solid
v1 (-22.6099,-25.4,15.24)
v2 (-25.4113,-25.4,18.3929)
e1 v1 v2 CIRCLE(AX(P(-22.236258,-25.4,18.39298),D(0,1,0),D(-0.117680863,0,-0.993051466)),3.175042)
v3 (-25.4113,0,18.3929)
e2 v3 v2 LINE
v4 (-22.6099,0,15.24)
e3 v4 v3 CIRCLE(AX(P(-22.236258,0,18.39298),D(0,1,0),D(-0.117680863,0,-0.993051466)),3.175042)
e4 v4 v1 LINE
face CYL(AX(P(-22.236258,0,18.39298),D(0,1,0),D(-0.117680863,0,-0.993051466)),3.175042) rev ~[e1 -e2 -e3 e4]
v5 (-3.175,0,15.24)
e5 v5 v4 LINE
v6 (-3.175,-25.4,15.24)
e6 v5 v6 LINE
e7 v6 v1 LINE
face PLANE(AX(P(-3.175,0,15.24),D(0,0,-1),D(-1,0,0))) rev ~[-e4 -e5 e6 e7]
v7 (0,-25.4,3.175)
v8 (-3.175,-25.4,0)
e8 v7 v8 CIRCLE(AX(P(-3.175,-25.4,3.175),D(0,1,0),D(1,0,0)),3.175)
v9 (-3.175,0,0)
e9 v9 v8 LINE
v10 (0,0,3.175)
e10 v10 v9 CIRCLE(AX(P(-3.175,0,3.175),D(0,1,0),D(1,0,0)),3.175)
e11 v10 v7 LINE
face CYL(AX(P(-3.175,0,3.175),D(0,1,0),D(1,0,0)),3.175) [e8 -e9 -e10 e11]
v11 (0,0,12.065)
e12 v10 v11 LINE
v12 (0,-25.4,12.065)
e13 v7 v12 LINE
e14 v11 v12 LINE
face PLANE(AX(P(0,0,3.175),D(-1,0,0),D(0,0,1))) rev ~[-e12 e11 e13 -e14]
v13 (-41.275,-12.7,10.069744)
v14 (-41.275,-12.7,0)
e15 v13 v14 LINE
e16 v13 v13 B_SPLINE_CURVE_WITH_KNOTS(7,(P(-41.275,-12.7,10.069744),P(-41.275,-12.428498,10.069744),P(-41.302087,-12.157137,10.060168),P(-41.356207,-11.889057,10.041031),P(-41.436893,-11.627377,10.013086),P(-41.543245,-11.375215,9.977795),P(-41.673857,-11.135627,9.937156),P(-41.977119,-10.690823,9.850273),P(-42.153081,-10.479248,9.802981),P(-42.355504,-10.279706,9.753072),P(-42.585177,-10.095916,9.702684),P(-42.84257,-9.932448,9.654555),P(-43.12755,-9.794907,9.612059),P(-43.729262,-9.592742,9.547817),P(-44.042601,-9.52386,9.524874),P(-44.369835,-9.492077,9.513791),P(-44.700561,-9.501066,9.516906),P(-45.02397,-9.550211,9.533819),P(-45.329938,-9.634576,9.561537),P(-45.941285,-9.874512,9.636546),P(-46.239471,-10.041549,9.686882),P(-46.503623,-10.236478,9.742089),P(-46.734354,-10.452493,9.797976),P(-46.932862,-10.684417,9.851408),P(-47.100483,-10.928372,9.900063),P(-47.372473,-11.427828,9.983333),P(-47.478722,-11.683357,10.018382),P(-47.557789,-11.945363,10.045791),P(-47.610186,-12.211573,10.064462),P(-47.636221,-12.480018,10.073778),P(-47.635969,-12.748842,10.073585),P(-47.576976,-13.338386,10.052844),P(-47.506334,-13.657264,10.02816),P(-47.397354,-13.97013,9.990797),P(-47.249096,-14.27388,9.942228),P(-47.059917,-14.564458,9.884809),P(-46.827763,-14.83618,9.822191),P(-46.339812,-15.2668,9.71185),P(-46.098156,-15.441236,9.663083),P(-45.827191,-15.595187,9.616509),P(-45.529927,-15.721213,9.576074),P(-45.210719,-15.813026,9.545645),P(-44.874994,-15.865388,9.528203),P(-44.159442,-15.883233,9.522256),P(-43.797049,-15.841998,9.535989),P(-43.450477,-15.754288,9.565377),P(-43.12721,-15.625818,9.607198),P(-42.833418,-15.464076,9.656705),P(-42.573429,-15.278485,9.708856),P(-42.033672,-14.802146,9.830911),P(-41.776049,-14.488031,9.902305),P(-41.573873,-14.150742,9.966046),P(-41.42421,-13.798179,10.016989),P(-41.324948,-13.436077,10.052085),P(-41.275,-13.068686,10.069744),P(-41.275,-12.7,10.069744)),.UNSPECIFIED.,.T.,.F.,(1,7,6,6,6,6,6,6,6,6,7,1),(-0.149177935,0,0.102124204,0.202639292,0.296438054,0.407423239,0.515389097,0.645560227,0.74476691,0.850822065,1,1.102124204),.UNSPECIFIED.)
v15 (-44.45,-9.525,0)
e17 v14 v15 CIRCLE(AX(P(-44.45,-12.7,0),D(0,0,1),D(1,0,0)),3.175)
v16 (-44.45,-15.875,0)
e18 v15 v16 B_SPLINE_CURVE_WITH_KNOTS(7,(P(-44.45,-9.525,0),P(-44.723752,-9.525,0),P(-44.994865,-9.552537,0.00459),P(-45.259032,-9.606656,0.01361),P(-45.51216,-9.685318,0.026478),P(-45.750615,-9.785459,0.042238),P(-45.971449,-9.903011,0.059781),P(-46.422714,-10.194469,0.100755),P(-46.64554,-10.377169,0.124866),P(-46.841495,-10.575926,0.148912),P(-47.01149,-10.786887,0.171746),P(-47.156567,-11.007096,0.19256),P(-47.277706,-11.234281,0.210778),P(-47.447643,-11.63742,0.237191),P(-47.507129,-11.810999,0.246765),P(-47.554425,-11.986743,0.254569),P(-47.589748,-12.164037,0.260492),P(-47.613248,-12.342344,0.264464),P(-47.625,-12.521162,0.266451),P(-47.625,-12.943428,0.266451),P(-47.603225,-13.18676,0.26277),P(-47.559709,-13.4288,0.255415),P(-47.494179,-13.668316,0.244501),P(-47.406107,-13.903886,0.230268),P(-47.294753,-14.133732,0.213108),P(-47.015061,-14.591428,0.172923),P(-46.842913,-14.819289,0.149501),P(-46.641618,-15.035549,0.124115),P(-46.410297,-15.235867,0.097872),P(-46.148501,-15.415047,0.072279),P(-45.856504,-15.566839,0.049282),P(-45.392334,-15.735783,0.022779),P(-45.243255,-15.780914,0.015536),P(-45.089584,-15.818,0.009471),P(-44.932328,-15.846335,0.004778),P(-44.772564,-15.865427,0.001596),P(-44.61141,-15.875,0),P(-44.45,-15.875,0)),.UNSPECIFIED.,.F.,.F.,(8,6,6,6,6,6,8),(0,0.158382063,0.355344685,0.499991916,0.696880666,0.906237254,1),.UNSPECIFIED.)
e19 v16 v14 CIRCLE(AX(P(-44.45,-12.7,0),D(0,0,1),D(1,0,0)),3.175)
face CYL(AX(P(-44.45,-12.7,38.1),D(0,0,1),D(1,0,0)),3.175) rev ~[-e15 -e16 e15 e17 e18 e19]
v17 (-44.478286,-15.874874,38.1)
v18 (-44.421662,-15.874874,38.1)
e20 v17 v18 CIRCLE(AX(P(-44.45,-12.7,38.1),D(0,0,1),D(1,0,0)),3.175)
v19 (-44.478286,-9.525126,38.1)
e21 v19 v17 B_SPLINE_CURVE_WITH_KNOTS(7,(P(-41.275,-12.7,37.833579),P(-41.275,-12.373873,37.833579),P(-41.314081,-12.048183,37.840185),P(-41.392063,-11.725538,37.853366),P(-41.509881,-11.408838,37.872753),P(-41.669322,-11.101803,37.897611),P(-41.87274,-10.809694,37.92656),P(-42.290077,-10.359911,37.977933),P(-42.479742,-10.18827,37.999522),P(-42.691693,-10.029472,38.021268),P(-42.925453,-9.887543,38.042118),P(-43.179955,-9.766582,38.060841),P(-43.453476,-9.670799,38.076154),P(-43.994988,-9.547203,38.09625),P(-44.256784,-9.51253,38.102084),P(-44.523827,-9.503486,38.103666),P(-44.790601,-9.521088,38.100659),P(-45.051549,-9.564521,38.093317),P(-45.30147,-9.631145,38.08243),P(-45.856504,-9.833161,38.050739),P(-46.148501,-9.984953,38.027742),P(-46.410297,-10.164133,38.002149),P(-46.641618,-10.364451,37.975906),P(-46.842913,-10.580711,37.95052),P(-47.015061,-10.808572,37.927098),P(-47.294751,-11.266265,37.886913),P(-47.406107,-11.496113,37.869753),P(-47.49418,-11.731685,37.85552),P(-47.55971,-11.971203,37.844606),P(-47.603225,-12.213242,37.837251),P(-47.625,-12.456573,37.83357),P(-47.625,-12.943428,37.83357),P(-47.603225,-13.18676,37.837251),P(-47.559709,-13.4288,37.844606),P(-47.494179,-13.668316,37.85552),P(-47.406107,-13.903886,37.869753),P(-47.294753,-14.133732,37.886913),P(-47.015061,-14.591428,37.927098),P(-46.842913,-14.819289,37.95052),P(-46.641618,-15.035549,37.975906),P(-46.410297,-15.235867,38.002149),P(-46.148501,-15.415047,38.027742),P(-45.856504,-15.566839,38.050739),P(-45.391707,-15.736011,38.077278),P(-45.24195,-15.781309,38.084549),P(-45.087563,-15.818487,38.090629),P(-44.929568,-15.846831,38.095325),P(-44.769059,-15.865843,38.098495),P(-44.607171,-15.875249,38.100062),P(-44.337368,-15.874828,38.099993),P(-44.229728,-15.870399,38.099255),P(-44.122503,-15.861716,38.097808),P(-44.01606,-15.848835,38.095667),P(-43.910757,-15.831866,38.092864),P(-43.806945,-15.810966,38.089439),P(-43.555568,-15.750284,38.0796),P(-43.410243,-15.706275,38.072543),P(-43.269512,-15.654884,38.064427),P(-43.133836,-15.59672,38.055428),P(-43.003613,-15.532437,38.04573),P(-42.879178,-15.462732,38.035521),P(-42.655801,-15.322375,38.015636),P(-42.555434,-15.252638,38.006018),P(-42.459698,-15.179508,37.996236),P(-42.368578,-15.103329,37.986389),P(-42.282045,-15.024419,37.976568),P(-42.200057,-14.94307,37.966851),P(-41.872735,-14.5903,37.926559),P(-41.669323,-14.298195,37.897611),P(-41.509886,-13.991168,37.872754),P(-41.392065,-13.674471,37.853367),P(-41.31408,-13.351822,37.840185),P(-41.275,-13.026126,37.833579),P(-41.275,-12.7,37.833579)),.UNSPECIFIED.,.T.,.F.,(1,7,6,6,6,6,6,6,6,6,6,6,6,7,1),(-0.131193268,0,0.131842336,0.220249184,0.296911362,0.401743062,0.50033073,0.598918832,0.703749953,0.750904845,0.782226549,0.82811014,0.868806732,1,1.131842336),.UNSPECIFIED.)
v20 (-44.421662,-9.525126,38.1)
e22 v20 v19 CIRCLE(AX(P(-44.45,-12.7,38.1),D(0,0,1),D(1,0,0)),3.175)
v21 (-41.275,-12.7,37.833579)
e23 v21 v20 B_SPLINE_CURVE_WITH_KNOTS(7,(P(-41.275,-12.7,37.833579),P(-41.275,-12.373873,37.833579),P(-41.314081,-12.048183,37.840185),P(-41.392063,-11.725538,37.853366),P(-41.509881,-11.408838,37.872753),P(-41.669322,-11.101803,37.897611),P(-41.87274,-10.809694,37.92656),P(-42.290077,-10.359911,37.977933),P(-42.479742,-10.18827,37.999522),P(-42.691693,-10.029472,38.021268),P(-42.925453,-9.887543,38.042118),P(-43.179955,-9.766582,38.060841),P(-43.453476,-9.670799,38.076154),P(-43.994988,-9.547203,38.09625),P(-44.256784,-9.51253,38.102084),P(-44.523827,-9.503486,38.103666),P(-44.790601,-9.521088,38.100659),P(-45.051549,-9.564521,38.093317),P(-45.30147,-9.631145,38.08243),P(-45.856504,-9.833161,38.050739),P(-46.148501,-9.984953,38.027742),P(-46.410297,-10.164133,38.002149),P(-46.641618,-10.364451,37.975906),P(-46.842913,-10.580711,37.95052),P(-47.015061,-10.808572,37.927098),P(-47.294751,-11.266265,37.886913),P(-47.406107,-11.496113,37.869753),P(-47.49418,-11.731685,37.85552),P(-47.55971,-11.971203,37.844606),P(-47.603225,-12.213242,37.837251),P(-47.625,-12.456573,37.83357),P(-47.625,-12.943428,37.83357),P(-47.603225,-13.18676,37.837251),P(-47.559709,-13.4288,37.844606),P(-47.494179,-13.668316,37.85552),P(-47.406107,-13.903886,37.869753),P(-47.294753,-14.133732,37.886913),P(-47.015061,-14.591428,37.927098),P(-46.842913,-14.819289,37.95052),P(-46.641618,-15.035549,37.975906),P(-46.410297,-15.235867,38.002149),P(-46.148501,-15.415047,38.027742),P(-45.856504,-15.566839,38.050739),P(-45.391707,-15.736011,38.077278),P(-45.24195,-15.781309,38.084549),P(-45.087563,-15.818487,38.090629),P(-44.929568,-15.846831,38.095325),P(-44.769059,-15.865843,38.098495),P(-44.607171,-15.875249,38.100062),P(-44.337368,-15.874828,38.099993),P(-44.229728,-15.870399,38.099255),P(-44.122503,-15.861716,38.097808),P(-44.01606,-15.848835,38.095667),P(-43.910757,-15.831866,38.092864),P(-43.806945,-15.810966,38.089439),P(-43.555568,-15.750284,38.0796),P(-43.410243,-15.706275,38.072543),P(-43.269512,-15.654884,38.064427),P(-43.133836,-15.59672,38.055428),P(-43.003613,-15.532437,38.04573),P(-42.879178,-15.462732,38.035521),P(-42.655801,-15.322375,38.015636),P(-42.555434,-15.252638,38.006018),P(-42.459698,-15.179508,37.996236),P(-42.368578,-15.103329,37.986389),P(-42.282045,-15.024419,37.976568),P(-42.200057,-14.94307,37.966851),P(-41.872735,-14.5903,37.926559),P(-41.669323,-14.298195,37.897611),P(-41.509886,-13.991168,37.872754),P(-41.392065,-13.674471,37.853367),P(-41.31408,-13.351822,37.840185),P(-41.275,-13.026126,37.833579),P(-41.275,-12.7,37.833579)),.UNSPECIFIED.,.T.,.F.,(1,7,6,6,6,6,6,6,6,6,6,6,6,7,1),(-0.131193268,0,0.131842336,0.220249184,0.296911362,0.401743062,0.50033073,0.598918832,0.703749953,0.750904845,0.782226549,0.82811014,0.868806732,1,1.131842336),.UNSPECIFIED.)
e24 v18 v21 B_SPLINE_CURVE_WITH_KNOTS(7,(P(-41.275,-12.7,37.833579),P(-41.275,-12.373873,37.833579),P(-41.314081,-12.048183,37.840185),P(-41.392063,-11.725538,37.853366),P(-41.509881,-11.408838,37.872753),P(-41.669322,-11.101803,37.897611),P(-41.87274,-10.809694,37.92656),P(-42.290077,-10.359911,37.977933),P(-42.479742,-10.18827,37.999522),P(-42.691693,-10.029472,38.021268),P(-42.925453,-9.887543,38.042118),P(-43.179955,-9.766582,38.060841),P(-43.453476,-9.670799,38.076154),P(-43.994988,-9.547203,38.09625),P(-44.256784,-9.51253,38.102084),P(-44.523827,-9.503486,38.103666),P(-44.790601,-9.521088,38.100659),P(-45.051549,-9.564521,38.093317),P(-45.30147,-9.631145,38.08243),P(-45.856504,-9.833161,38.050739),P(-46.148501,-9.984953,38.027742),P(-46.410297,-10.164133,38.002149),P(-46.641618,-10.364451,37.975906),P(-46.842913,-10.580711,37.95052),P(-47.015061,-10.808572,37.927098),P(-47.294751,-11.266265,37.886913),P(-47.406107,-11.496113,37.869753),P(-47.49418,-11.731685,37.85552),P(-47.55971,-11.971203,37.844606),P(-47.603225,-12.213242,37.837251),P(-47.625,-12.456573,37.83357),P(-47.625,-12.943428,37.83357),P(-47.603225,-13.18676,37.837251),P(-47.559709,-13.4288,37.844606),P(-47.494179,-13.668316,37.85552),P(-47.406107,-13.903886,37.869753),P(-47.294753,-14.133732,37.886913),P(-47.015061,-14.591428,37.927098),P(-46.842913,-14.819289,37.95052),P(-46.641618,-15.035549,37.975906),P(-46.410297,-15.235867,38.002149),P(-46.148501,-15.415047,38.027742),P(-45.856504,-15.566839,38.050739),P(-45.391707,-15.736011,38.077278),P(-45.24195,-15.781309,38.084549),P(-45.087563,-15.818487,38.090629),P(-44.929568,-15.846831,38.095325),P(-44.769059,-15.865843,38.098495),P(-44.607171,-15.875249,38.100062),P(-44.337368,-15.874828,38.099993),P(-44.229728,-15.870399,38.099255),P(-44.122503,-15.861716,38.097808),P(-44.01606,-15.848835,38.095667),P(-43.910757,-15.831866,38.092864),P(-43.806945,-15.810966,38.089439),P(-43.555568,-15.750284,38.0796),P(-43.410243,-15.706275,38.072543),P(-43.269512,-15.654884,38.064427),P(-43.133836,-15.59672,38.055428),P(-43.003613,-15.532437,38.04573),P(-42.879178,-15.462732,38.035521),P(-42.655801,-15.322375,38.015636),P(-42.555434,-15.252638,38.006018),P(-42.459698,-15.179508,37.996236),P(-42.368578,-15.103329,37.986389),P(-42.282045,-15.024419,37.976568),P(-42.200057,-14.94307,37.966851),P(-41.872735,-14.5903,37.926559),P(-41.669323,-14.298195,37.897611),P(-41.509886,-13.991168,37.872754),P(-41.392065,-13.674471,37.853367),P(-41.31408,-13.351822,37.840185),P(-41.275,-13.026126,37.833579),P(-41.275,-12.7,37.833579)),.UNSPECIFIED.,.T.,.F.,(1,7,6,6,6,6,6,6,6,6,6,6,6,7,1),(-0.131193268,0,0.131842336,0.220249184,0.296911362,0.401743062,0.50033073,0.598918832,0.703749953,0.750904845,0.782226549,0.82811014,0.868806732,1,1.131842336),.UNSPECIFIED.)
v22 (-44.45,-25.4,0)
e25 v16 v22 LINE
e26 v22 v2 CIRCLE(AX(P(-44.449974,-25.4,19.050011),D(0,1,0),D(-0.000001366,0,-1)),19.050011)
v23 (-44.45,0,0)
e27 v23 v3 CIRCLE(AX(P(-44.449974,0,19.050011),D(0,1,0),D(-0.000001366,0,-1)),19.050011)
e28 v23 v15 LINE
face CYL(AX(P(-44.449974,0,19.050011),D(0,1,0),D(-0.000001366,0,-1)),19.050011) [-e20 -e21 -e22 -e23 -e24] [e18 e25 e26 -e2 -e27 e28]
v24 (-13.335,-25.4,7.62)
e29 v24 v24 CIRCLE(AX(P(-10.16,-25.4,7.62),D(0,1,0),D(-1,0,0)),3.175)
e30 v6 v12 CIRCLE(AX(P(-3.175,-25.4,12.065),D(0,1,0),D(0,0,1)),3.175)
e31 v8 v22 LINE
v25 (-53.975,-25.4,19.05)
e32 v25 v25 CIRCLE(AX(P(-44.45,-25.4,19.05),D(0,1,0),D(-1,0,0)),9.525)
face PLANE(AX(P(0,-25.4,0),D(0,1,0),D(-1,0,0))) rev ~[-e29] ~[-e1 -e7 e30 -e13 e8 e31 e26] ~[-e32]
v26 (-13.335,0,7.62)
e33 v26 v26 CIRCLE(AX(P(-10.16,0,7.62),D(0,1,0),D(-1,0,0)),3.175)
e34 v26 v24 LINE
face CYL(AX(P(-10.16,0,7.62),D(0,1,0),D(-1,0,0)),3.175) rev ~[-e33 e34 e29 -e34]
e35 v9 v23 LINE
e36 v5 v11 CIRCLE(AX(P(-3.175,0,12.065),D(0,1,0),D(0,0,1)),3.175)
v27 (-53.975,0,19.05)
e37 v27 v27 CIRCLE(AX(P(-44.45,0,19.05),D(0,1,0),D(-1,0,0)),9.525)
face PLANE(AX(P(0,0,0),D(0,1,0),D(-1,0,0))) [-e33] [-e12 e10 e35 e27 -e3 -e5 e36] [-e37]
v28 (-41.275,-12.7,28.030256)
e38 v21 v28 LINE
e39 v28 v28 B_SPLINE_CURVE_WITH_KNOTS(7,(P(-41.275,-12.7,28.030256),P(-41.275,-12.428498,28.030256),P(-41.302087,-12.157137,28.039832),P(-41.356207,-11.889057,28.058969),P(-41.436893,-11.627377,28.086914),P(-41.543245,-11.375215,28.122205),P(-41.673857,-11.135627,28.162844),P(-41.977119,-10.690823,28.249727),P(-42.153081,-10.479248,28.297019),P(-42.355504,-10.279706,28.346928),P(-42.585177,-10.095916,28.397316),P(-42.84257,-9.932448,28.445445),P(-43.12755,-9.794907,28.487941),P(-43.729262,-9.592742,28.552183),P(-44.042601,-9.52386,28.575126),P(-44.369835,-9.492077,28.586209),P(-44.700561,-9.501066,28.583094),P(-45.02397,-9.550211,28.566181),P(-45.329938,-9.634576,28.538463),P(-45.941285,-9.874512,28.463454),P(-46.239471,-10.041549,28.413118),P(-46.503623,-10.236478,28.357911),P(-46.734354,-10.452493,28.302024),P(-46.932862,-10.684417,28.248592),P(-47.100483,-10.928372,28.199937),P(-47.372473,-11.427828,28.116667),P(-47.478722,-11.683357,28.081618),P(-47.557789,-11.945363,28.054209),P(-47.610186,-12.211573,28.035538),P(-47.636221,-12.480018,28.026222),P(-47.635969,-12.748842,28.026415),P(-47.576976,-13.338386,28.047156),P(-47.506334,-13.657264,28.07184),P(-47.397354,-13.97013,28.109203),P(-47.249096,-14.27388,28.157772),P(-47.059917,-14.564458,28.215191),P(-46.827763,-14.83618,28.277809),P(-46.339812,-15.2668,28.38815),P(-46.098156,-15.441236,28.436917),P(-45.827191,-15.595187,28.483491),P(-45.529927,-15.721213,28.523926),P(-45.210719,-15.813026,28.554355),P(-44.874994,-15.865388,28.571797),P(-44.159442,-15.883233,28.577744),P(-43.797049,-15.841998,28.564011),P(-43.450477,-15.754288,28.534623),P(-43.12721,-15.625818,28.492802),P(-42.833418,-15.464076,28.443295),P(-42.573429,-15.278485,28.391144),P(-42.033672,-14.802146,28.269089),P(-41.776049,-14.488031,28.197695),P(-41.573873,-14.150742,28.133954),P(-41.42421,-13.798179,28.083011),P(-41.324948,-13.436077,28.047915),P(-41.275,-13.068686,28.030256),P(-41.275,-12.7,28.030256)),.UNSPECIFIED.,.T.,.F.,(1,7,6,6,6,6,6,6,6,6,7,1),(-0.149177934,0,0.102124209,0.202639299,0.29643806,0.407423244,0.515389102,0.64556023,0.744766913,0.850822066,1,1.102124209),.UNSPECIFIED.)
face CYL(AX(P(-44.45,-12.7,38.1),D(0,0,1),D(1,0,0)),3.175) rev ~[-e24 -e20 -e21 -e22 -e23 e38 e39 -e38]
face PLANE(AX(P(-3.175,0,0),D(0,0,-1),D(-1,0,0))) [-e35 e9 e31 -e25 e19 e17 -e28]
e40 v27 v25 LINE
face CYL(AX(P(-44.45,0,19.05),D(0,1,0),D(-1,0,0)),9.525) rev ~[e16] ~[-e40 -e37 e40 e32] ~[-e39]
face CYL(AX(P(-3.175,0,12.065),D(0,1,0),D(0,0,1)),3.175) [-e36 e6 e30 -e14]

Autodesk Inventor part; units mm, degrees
ref_plane "YZ Plane" through (0, 0, 0) normal (1, 0, 0) x (0, 1, 0)
ref_plane "XZ Plane" through (0, 0, 0) normal (0, 1, 0) x (-1, 0, 0)
ref_plane "XY Plane" through (0, 0, 0) normal (0, 0, 1) x (1, 0, 0)
sketch "Sketch1" plane through (0, 0, 0) normal (0, 0, 1) x (1, 0, 0)
  point P0 (0, 0)
sketch "Sketch2" plane through (0, 0, 0) normal (0, 1, 0) x (-1, 0, 0)
  line L0 (3.175, 0) -> (44.45, 0)
  circle A0 centre (44.45, 19.05) radius 9.525
  arc A1 (44.45, 0) -> (25.4113, 18.3929) centre (44.45, 19.05) ccw
  line L1 (0, 3.175) -> (0, 12.065)
  circle A2 centre (10.16, 7.62) radius 3.175
  line L2 (3.175, 15.24) -> (22.6099, 15.24)
  arc A3 (3.175, 15.24) -> (0, 12.065) centre (3.175, 12.065) ccw
  arc A4 (0, 3.175) -> (3.175, 0) centre (3.175, 3.175) ccw
  arc A5 (22.6099, 15.24) -> (25.4113, 18.3929) centre (22.2363, 18.3929) ccw
  point P0 (0, 0)
  point P1 (0, 15.24)
  dimension "d1" = 44.45
  dimension "d3" = 19.05
  dimension "d4" = 38.1
  dimension "d5" = 15.24
  dimension "d7" = 6.35
  dimension "d8" = 3.175
  dimension "d11" = 3.175
extrude "Extrusion1" add sketch "Sketch2" against normal blind 25.4
ref_plane "Work Plane5" through (-44.45, 0, 38.1) normal (0, 0, 1) x (1, 0, 0)
sketch "Sketch5" plane through (-44.45, 0, 38.1) normal (0, 0, 1) x (1, 0, 0)
  line L0 (-19.05, 0) -> (-19.05, -25.4) projected
  circle A0 centre (0, -12.7) radius 3.175
  point P0 (44.45, 0)
  point P1 (0, -25.4)
  point P2 (19.0387, -25.4)
  dimension "d21" = 6.35
extrude "Extrusion2" cut sketch "Sketch5" against normal through all
properties part number "Assignment 2.6 - Shaft Guide"
